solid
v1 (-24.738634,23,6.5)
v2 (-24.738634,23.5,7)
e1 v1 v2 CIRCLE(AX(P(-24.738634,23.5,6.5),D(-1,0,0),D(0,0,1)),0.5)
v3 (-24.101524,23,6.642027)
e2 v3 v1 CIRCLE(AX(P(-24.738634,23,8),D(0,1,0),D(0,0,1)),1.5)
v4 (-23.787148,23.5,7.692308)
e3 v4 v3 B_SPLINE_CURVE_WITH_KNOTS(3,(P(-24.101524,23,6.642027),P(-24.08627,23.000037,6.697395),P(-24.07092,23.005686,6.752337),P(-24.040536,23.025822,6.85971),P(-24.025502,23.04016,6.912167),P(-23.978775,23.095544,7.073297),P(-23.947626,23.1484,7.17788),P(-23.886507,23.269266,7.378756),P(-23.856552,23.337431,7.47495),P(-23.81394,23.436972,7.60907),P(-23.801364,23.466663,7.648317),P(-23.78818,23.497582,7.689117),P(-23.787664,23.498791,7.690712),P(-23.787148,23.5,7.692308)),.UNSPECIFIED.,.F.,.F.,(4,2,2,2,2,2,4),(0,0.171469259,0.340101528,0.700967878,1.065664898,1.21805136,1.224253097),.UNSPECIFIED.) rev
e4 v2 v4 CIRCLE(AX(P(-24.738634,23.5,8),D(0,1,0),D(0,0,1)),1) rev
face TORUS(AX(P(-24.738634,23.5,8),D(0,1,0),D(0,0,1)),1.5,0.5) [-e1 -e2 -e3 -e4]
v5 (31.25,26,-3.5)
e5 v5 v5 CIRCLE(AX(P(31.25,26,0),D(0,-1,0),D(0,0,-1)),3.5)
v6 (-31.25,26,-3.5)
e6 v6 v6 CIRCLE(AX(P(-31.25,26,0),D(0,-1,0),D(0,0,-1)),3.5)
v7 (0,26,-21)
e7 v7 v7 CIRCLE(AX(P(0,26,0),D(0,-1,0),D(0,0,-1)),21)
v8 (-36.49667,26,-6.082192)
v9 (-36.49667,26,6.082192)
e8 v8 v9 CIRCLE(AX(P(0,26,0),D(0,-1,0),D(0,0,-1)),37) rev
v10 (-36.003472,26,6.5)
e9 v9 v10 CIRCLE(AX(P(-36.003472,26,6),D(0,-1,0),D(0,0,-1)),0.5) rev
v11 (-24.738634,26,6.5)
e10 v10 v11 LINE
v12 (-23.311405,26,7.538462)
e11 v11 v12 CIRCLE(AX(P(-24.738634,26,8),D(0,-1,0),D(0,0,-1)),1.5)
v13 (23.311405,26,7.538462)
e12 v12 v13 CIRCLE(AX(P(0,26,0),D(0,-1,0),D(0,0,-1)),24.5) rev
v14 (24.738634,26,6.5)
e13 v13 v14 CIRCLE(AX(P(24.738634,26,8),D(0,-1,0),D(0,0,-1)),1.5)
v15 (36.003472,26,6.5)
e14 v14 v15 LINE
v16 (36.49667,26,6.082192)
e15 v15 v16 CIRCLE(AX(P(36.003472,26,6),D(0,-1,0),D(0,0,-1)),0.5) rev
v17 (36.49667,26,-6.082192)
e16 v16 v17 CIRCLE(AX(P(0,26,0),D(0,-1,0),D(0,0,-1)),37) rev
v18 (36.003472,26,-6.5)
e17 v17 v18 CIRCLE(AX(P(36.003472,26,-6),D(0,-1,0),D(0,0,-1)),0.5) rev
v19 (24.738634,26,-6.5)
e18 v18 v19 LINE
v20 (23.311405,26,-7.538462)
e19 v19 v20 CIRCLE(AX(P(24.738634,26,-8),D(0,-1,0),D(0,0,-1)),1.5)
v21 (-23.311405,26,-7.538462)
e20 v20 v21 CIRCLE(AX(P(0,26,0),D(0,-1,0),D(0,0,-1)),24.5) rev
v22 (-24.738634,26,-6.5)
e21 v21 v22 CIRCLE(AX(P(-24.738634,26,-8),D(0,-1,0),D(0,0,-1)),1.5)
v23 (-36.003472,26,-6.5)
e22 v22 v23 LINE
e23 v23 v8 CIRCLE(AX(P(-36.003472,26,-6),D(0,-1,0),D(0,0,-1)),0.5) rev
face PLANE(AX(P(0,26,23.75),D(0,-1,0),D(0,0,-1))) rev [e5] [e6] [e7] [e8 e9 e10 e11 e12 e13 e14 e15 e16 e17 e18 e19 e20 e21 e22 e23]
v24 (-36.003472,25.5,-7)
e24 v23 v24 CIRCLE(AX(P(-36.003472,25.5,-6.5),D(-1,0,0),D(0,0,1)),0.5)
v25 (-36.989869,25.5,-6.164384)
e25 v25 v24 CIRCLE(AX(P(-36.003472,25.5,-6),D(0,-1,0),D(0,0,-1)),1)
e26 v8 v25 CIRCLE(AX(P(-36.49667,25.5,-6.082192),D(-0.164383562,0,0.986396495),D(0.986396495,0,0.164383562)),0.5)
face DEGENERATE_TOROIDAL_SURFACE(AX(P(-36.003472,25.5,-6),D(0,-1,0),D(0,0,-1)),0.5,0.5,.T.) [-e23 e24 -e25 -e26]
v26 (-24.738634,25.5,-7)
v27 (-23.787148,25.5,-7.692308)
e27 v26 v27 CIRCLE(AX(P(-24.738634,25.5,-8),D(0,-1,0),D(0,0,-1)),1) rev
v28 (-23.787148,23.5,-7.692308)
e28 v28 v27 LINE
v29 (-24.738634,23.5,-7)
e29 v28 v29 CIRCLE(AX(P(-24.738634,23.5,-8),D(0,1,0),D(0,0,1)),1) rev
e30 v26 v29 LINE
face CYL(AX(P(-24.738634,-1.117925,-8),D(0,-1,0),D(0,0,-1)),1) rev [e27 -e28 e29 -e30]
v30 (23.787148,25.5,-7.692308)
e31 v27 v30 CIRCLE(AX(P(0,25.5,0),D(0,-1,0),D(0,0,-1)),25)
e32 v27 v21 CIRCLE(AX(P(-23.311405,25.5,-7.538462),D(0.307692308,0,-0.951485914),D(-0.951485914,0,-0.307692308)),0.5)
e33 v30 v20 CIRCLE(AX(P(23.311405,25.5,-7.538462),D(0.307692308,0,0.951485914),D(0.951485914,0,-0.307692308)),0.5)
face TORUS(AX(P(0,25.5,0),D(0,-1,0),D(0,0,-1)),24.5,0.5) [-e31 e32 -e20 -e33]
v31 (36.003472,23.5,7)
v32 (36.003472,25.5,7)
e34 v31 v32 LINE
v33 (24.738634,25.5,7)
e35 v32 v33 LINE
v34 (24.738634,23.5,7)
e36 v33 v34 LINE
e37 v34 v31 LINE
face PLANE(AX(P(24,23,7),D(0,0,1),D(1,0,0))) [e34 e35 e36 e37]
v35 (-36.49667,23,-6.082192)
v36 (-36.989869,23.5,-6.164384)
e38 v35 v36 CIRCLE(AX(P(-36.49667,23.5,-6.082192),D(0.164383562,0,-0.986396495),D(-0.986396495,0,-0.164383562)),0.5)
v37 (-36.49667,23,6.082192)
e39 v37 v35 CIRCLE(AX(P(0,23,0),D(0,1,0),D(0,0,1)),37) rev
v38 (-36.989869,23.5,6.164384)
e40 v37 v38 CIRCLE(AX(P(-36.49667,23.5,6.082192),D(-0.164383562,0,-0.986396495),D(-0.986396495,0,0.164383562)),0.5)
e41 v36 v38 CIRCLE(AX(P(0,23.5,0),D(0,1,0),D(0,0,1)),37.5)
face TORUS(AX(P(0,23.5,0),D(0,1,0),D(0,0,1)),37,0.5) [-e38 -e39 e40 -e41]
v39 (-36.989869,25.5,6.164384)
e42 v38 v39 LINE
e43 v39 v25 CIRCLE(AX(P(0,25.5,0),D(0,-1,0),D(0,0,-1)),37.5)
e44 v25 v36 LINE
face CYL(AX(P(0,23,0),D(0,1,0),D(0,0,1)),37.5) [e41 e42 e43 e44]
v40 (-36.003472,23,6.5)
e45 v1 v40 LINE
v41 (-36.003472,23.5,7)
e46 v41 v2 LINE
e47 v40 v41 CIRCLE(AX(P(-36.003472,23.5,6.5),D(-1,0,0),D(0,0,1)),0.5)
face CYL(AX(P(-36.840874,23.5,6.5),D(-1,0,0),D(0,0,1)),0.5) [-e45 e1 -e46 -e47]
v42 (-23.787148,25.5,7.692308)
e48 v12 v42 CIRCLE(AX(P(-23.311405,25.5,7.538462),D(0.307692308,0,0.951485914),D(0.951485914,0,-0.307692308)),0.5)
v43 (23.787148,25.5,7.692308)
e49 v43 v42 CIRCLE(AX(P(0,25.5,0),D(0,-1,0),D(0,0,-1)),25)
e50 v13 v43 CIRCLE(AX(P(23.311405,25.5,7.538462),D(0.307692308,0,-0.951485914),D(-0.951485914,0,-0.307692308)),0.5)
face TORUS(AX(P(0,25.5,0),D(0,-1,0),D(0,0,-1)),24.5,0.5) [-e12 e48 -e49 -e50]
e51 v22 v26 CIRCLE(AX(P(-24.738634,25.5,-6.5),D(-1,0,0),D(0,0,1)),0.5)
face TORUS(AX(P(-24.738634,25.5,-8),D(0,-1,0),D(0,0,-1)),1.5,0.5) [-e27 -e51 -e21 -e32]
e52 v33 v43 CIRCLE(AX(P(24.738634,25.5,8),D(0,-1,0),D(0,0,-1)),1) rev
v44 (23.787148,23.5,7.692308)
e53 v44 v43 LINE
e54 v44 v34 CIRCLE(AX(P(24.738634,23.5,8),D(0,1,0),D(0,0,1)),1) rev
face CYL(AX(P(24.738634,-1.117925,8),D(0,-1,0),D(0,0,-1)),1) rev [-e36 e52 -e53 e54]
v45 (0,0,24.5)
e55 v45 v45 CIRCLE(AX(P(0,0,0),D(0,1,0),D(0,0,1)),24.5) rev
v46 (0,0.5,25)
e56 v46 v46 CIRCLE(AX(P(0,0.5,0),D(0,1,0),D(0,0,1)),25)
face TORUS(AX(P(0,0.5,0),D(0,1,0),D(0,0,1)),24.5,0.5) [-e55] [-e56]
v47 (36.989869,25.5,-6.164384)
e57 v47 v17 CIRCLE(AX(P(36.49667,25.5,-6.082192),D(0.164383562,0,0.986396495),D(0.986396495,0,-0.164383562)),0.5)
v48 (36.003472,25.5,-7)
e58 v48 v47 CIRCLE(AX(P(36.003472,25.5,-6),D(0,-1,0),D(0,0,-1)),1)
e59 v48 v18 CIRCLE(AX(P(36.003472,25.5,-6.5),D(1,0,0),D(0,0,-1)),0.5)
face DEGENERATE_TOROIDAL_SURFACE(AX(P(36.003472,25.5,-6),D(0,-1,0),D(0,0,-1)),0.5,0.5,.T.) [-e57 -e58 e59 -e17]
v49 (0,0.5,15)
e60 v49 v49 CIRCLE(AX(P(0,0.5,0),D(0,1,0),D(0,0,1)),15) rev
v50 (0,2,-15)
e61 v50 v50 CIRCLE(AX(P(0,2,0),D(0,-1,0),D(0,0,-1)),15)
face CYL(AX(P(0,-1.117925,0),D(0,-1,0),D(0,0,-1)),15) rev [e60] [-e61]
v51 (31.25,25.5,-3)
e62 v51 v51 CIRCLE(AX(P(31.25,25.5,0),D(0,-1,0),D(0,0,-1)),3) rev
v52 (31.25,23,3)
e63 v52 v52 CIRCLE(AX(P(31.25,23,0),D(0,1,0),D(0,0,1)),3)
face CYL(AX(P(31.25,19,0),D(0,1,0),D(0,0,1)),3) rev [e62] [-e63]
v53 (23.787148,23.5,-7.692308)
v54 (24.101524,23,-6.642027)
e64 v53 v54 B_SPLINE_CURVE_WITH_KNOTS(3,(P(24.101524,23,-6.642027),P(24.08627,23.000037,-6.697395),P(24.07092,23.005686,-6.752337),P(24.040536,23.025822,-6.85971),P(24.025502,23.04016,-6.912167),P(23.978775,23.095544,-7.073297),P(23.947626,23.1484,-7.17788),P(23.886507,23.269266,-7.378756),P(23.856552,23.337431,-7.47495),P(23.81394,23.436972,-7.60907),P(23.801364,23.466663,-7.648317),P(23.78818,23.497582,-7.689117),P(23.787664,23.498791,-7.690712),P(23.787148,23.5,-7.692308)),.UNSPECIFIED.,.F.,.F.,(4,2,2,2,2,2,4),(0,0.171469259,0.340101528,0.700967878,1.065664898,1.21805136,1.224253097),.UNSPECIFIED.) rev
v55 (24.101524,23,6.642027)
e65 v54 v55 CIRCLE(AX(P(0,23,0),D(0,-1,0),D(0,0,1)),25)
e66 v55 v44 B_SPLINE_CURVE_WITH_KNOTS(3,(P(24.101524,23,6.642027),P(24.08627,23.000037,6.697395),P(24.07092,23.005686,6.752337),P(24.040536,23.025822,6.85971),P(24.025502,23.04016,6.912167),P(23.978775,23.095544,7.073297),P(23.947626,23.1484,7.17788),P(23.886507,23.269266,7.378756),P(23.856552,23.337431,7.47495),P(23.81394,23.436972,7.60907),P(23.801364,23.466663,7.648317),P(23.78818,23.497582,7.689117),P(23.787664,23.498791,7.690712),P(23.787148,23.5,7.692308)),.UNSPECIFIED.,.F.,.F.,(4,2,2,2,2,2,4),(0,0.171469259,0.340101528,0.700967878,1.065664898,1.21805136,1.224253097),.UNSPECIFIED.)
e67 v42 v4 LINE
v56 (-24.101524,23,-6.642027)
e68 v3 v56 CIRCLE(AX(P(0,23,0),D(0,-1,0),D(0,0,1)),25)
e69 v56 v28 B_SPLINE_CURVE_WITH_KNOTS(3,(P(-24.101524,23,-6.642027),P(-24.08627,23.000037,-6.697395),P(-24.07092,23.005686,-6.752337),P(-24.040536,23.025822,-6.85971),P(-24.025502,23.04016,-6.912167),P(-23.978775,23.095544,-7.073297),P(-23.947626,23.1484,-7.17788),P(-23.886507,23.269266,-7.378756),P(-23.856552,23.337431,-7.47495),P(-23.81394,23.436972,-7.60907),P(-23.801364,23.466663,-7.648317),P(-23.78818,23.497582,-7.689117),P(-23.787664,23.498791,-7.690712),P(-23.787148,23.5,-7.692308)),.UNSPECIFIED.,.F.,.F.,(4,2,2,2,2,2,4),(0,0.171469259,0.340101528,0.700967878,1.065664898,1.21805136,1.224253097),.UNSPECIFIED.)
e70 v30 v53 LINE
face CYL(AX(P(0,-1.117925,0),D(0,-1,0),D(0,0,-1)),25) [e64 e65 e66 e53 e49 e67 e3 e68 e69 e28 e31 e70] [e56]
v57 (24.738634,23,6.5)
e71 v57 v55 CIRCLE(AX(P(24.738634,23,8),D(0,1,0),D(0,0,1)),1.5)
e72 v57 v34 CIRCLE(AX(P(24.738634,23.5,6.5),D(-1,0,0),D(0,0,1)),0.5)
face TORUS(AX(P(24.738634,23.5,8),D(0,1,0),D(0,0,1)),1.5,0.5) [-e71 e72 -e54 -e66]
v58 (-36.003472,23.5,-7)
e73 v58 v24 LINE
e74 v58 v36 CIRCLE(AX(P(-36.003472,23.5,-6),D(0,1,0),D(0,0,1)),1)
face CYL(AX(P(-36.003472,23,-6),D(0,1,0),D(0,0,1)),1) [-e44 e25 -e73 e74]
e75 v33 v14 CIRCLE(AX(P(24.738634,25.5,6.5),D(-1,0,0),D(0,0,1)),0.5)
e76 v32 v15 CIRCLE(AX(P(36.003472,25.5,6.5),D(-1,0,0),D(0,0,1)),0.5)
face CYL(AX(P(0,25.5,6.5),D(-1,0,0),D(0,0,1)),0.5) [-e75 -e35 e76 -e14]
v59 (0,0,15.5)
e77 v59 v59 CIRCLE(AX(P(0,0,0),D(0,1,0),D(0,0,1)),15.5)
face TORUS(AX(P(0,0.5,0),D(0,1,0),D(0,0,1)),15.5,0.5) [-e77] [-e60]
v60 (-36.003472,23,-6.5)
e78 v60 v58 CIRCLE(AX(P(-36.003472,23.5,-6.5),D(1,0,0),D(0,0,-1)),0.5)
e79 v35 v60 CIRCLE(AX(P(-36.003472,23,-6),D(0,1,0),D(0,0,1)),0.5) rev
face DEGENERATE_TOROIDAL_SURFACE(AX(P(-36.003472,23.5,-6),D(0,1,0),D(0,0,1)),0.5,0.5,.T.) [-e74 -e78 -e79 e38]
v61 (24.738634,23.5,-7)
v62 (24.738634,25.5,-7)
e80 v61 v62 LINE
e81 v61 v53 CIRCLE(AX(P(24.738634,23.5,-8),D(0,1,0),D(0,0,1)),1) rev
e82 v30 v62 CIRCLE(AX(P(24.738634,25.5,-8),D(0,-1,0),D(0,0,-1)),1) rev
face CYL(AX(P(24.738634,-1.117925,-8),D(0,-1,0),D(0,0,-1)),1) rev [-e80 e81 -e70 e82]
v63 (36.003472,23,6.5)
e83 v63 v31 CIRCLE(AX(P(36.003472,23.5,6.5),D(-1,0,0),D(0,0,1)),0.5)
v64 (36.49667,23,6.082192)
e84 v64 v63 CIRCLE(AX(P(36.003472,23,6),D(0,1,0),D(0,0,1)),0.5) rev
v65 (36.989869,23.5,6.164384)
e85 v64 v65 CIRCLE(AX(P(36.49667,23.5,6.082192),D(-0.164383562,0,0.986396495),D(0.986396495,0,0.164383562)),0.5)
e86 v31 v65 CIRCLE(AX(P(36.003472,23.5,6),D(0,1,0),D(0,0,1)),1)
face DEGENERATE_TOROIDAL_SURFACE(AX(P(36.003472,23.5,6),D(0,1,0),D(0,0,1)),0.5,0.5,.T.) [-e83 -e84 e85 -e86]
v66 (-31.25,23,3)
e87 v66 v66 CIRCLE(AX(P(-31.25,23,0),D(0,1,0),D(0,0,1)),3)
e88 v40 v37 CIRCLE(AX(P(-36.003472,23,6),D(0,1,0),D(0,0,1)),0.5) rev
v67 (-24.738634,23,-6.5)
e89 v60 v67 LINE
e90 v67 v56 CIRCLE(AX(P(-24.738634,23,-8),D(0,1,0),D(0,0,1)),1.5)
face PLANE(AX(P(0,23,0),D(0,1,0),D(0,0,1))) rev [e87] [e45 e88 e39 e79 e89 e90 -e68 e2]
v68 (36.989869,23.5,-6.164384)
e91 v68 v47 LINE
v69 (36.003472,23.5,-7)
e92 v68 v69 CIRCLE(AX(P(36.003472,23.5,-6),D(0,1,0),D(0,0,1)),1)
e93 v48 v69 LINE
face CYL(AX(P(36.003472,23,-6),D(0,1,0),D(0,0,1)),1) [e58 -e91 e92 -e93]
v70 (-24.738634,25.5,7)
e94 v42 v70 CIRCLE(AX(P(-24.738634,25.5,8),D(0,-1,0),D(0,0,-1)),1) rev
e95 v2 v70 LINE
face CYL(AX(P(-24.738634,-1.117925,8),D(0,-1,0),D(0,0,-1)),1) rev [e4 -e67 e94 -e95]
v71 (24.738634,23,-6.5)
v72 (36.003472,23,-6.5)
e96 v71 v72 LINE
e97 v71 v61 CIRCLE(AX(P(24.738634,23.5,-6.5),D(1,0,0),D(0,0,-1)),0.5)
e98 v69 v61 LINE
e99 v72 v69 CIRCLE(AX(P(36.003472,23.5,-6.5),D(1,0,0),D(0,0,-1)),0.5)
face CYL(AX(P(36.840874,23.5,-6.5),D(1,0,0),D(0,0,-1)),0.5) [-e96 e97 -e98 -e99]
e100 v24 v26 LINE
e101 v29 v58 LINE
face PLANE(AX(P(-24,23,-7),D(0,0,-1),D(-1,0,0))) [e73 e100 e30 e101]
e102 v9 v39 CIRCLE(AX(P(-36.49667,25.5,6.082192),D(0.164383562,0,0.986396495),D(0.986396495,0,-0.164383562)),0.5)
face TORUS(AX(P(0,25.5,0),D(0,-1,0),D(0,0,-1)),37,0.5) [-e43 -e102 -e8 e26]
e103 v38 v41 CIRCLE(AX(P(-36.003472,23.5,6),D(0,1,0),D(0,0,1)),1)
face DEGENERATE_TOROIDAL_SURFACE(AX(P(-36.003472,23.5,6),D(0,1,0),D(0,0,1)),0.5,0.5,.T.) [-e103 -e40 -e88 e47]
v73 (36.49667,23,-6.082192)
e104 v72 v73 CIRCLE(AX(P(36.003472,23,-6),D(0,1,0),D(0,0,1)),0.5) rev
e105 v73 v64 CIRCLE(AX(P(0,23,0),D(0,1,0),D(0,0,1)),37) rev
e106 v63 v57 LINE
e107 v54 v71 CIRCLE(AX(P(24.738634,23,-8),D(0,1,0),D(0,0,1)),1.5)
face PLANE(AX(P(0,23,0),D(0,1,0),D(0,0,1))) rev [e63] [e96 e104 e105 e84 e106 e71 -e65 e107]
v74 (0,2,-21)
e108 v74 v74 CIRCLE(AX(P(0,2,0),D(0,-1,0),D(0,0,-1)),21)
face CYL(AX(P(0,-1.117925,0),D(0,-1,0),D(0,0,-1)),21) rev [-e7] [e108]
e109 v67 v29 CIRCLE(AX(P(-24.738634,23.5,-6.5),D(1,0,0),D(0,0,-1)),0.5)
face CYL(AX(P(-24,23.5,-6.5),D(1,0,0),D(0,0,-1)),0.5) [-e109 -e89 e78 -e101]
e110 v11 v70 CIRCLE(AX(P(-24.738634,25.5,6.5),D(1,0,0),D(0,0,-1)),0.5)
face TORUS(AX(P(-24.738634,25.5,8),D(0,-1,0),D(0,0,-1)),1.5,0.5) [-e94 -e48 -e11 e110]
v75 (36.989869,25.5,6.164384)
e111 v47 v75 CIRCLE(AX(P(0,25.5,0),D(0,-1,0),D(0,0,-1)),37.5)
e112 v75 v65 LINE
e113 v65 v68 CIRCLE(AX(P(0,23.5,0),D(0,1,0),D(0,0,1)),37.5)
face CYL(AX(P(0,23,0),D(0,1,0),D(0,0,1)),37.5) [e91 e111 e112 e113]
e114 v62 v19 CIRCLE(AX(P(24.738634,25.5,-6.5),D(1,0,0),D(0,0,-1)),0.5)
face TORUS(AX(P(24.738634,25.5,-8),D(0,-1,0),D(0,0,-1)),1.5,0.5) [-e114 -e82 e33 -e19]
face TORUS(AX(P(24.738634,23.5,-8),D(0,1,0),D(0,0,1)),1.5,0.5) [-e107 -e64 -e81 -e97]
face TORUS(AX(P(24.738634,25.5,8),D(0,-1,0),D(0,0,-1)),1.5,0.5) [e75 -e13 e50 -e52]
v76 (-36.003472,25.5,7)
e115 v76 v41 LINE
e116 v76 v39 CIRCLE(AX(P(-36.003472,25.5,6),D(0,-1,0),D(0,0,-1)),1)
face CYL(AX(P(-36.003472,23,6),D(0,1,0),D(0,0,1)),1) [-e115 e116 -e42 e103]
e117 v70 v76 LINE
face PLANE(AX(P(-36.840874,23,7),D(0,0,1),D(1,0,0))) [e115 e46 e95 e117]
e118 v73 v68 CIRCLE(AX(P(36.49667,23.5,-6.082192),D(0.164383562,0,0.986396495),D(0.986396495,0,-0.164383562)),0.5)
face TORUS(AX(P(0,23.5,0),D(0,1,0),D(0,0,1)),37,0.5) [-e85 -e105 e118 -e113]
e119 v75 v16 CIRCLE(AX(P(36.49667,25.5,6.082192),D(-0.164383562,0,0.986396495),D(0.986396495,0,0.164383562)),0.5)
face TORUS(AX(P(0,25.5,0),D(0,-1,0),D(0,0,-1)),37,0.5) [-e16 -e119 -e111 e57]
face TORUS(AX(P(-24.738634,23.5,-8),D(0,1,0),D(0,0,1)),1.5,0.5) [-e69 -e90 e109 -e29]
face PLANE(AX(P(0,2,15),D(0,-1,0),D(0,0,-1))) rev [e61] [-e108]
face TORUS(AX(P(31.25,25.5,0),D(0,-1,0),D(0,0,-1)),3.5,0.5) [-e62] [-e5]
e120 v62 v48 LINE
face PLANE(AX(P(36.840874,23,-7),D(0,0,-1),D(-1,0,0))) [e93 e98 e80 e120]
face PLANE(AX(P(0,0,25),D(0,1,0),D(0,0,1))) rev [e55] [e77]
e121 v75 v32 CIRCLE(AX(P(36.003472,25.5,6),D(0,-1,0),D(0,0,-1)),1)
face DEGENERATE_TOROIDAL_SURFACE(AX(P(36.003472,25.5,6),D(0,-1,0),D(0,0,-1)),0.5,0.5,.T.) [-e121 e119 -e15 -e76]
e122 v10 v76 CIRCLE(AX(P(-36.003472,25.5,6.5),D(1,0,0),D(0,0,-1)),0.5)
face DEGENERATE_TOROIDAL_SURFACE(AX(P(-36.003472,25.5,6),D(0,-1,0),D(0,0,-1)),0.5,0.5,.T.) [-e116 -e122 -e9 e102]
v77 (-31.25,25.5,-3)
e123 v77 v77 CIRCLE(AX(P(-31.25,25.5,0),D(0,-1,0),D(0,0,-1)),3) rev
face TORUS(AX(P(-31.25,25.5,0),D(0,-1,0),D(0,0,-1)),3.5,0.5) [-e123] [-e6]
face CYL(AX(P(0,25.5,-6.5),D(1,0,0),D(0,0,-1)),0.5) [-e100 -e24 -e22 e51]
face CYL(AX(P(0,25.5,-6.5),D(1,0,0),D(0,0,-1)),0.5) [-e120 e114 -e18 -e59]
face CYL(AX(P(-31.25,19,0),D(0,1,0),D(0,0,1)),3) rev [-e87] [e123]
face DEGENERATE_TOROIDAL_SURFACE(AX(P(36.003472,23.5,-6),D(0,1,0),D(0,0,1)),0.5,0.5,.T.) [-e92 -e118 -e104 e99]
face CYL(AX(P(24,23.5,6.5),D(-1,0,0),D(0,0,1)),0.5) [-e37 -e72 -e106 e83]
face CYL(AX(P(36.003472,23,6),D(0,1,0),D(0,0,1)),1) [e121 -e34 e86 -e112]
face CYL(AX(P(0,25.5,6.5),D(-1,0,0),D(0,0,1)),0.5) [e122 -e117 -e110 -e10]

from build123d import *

# Parameters (mm, degrees)
BOSS_EXTRUDE2_START = -3
BOSS_EXTRUDE2_DEPTH = 3
SKETCH8_R           = 3
CUT_EXTRUDE2_DEPTH  = 7
FILLET_1_R          = 1
FILLET_2_R          = 0.5
FILLET_3_R          = 0.5
FILLET_4_R          = 0.5


with BuildPart() as part:
    # Sketch4 → Revolve1 (revolve)
    with BuildSketch(Plane(origin=(0, 0, 0), x_dir=(0, 0, -1), z_dir=(1, 0, 0)), mode=Mode.PRIVATE) as revolve1_sk:
        Polygon((-23.75, 26), (-25, 26), (-25, 0), (-15, 0), (-15, 2), (-21, 2), (-21, 26), align=None)
    revolve(revolve1_sk.sketch.rotate(Axis((0, -1.117924861, 0), (0, 1, 0)), 180), axis=Axis((0, -1.117924861, 0), (0, 1, 0)))

    # Sketch7 → Boss-Extrude2 (add)
    with BuildSketch(Plane(origin=(0, 26, 0), x_dir=(1, 0, 0), z_dir=(0, 1, 0)).offset(BOSS_EXTRUDE2_START)):
        with BuildLine():
            Line((-36.84087404, -7), (-24, -7))
            ThreePointArc((-24, -7), (-25, 0), (-24, 7))
            Line((-24, 7), (-36.84087404, 7))
            ThreePointArc((-36.84087404, 7), (-37.5, 0), (-36.84087404, -7))
        make_face()
        with BuildLine():
            Line((36.84087404, 7), (24, 7))
            ThreePointArc((24, 7), (25, 0), (24, -7))
            Line((24, -7), (36.84087404, -7))
            ThreePointArc((36.84087404, -7), (37.5, 0), (36.84087404, 7))
        make_face()
    extrude(amount=BOSS_EXTRUDE2_DEPTH)

    # Sketch8 → Cut-Extrude2 (cut)
    with BuildSketch(Plane(origin=(0, 26, 0), x_dir=(1, 0, 0), z_dir=(0, 1, 0))):
        with Locations(Location((31.25, 0, 0), (0, 0, 270))):
            Circle(SKETCH8_R)
        with Locations(Location((-31.25, 0, 0), (0, 0, 270))):
            Circle(SKETCH8_R)
    extrude(amount=-CUT_EXTRUDE2_DEPTH, mode=Mode.SUBTRACT)

    # 圆角1
    fillet_1_edges = [part.edges().sort_by_distance(p)[0] for p in [
        (-24, 24.5, -7),
        (-24, 24.5, 7),
        (-36.84087404, 24.5, 7),
        (-36.84087404, 24.5, -7),
        (36.84087404, 24.5, -7),
        (36.84087404, 24.5, 7),
        (24, 24.5, 7),
        (24, 24.5, -7),
    ]]
    fillet(fillet_1_edges, radius=FILLET_1_R)

    # 圆角2
    fillet_2_edges = [part.edges().sort_by_distance(p)[0] for p in [
        (-30.371052904, 26, 7),
        (0, 26, 25),
        (-14.708710135, 26, -20.215188502),
        (-37.5, 26, 0),
        (-30.371052904, 26, -7),
        (30.371052904, 26, 7),
        (37.5, 26, 0),
        (30.371052904, 26, -7),
        (36.649852917, 26, -6.763014928),
        (36.649852917, 26, 6.763014928),
        (-36.649852917, 26, -6.763014928),
        (-36.649852917, 26, 6.763014928),
        (-24.150285348, 26, 7.19139246),
        (-24.150285348, 26, -7.19139246),
        (24.150285348, 26, -7.19139246),
        (24.150285348, 26, 7.19139246),
    ]]
    fillet(fillet_2_edges, radius=FILLET_2_R)

    # 圆角3
    # the kernel refuses this fillet: 0.5 mm, written as the material it takes off along each edge
    with BuildSketch(Plane(origin=(31.25, 26, 0), x_dir=(0, 0, 1), z_dir=(-1, 0, 0))) as fillet_3_piece_1:
        with BuildLine():
            CenterArc((3 + FILLET_3_R, -FILLET_3_R), FILLET_3_R, 90, 90)
            Line((3, -FILLET_3_R), (3, 0))
            Line((3, 0), (3 + FILLET_3_R, 0))
        make_face()
    revolve(axis=Axis((31.25, 26, 0), (0, 1, 0)), mode=Mode.SUBTRACT)
    with BuildSketch(Plane(origin=(-31.25, 26, 0), x_dir=(0, 0, 1), z_dir=(-1, 0, 0))) as fillet_3_piece_2:
        with BuildLine():
            CenterArc((3 + FILLET_3_R, -FILLET_3_R), FILLET_3_R, 90, 90)
            Line((3, -FILLET_3_R), (3, 0))
            Line((3, 0), (3 + FILLET_3_R, 0))
        make_face()
    revolve(axis=Axis((-31.25, 26, 0), (0, 1, 0)), mode=Mode.SUBTRACT)
    with BuildSketch(Plane(origin=(-36.003472055, 23, 7), x_dir=(0, 0, -1), z_dir=(1, 0, 0)), Plane(origin=(-24.738633754, 23, -7), x_dir=(0, 0, 1), z_dir=(-1, 0, 0))) as fillet_3_piece_3:
        with BuildLine():
            CenterArc((FILLET_3_R, FILLET_3_R), FILLET_3_R, 180, 90)
            Line((0, FILLET_3_R), (0, 0))
            Line((0, 0), (FILLET_3_R, 0))
        make_face()
    extrude(amount=11.264838301, mode=Mode.SUBTRACT)
    with BuildSketch(Plane(origin=(0, 23, 0), x_dir=(-0.9863964946517639, 0, -0.16438356164383516), z_dir=(0.16438356164383516, 0, -0.9863964946517639))) as fillet_3_piece_4:
        with BuildLine():
            CenterArc((37.5 - FILLET_3_R, FILLET_3_R), FILLET_3_R, 270, 90)
            Line((37.5, FILLET_3_R), (37.5, 0))
            Line((37.5, 0), (37.5 - FILLET_3_R, 0))
        make_face()
    revolve(axis=Axis((0, 23, 0), (0, 1, 0)), revolution_arc=18.922852385, mode=Mode.SUBTRACT)
    with BuildSketch(Plane(origin=(-36.003472055, 23, -6), x_dir=(0, 0, -1), z_dir=(1, 0, 0))) as fillet_3_piece_5:
        with BuildLine():
            CenterArc((1 - FILLET_3_R, FILLET_3_R), FILLET_3_R, 270, 90)
            Line((1, FILLET_3_R), (1, 0))
            Line((1, 0), (1 - FILLET_3_R, 0))
        make_face()
    revolve(axis=Axis((-36.003472055, 23, -6), (0, 1, 0)), revolution_arc=80.538573807, mode=Mode.SUBTRACT)
    with BuildSketch(Plane(origin=(-36.003472055, 23, 6), x_dir=(-0.9863964946517644, 0, 0.16438356164383278), z_dir=(-0.16438356164383278, 0, -0.9863964946517644))) as fillet_3_piece_6:
        with BuildLine():
            CenterArc((1 - FILLET_3_R, FILLET_3_R), FILLET_3_R, 270, 90)
            Line((1, FILLET_3_R), (1, 0))
            Line((1, 0), (1 - FILLET_3_R, 0))
        make_face()
    revolve(axis=Axis((-36.003472055, 23, 6), (0, 1, 0)), revolution_arc=80.538573807, mode=Mode.SUBTRACT)
    with BuildSketch(Plane(origin=(36.003472055, 23, -7), x_dir=(0, 1, 0), z_dir=(-1, 0, 0)), Plane(origin=(24.738633754, 23, 7), x_dir=(0, 1, 0), z_dir=(1, 0, 0))) as fillet_3_piece_7:
        with BuildLine():
            CenterArc((FILLET_3_R, -FILLET_3_R), FILLET_3_R, 90, 90)
            Line((0, -FILLET_3_R), (0, 0))
            Line((0, 0), (FILLET_3_R, 0))
        make_face()
    extrude(amount=11.264838301, mode=Mode.SUBTRACT)
    with BuildSketch(Plane(origin=(0, 23, 0), x_dir=(0.9863964946517639, 0, 0.16438356164383516), z_dir=(-0.16438356164383516, 0, 0.9863964946517639))) as fillet_3_piece_8:
        with BuildLine():
            CenterArc((37.5 - FILLET_3_R, FILLET_3_R), FILLET_3_R, 270, 90)
            Line((37.5 - FILLET_3_R, 0), (37.5, 0))
            Line((37.5, 0), (37.5, FILLET_3_R))
        make_face()
    revolve(axis=Axis((0, 23, 0), (0, 1, 0)), revolution_arc=18.922852385, mode=Mode.SUBTRACT)
    with BuildSketch(Plane(origin=(36.003472055, 23, -6), x_dir=(0, 0, -1), z_dir=(-1, 0, 0))) as fillet_3_piece_9:
        with BuildLine():
            CenterArc((1 - FILLET_3_R, -FILLET_3_R), FILLET_3_R, 0, 90)
            Line((1 - FILLET_3_R, 0), (1, 0))
            Line((1, 0), (1, -FILLET_3_R))
        make_face()
    revolve(axis=Axis((36.003472055, 23, -6), (0, -1, 0)), revolution_arc=80.538573807, mode=Mode.SUBTRACT)
    with BuildSketch(Plane(origin=(36.003472055, 23, 6), x_dir=(0.9863964946517638, 0, 0.16438356164383625), z_dir=(0.16438356164383625, 0, -0.9863964946517638))) as fillet_3_piece_10:
        with BuildLine():
            CenterArc((1 - FILLET_3_R, -FILLET_3_R), FILLET_3_R, 0, 90)
            Line((1 - FILLET_3_R, 0), (1, 0))
            Line((1, 0), (1, -FILLET_3_R))
        make_face()
    revolve(axis=Axis((36.003472055, 23, 6), (0, -1, 0)), revolution_arc=80.538573807, mode=Mode.SUBTRACT)
    with BuildSketch(Plane(origin=(-24.738633754, 23, 8), x_dir=(0.5917604779499825, 0, 0.8061138484956132), z_dir=(-0.8061138484956132, 0, 0.5917604779499825))) as fillet_3_piece_11_section:
        with BuildLine():
            CenterArc((1 + FILLET_3_R, FILLET_3_R), FILLET_3_R, 180, 90)
            Line((1, FILLET_3_R), (1, 0))
            Line((1, 0), (1 + FILLET_3_R, 0))
        make_face()
    fillet_3_piece_11 = revolve(axis=Axis((-24.738633754, 23, 8), (0, 1, 0)), revolution_arc=143.717963168, mode=Mode.PRIVATE)
    fillet_3_piece_11 = fillet_3_piece_11 - Plane(origin=(0, 23.150919567, 0), x_dir=(0, 0, -1), z_dir=(0, -1, 0)) * Cylinder(25, 7, mode=Mode.PRIVATE)
    add(fillet_3_piece_11, mode=Mode.SUBTRACT)
    with BuildSketch(Plane(origin=(-24.738633754, 23, -8), x_dir=(0.5917604779499793, 0, -0.8061138484956154), z_dir=(-0.8061138484956154, 0, -0.5917604779499793))) as fillet_3_piece_12_section:
        with BuildLine():
            CenterArc((1 + FILLET_3_R, -FILLET_3_R), FILLET_3_R, 90, 90)
            Line((1, -FILLET_3_R), (1, 0))
            Line((1, 0), (1 + FILLET_3_R, 0))
        make_face()
    fillet_3_piece_12 = revolve(axis=Axis((-24.738633754, 23, -8), (0, -1, 0)), revolution_arc=143.717963168, mode=Mode.PRIVATE)
    fillet_3_piece_12 = fillet_3_piece_12 - Plane(origin=(0, 23.150919582, 0), x_dir=(0, 0, -1), z_dir=(0, -1, 0)) * Cylinder(25, 7, mode=Mode.PRIVATE)
    add(fillet_3_piece_12, mode=Mode.SUBTRACT)
    with BuildSketch(Plane(origin=(24.738633754, 23, -8), x_dir=(-0.5917604779499896, 0, -0.8061138484956079), z_dir=(0.8061138484956079, 0, -0.5917604779499896))) as fillet_3_piece_13_section:
        with BuildLine():
            CenterArc((1 + FILLET_3_R, FILLET_3_R), FILLET_3_R, 180, 90)
            Line((1, FILLET_3_R), (1, 0))
            Line((1, 0), (1 + FILLET_3_R, 0))
        make_face()
    fillet_3_piece_13 = revolve(axis=Axis((24.738633754, 23, -8), (0, 1, 0)), revolution_arc=143.717963168, mode=Mode.PRIVATE)
    fillet_3_piece_13 = fillet_3_piece_13 - Plane(origin=(0, 23.150919567, 0), x_dir=(0, 0, -1), z_dir=(0, -1, 0)) * Cylinder(25, 6, mode=Mode.PRIVATE)
    add(fillet_3_piece_13, mode=Mode.SUBTRACT)
    with BuildSketch(Plane(origin=(24.738633754, 23, 8), x_dir=(-0.5917604779499825, 0, 0.8061138484956132), z_dir=(0.8061138484956132, 0, 0.5917604779499825))) as fillet_3_piece_14_section:
        with BuildLine():
            CenterArc((1 + FILLET_3_R, -FILLET_3_R), FILLET_3_R, 90, 90)
            Line((1 + FILLET_3_R, 0), (1, 0))
            Line((1, 0), (1, -FILLET_3_R))
        make_face()
    fillet_3_piece_14 = revolve(axis=Axis((24.738633754, 23, 8), (0, -1, 0)), revolution_arc=143.717963168, mode=Mode.PRIVATE)
    fillet_3_piece_14 = fillet_3_piece_14 - Plane(origin=(0, 23.150919568, 0), x_dir=(0, 0, -1), z_dir=(0, -1, 0)) * Cylinder(25, 7, mode=Mode.PRIVATE)
    add(fillet_3_piece_14, mode=Mode.SUBTRACT)

    # 圆角4
    fillet_4_edges = [part.edges().sort_by_distance(p)[0] for p in [
        (0, 0, 25),
        (0, 0, 15),
    ]]
    fillet(fillet_4_edges, radius=FILLET_4_R)


solid = part.part
